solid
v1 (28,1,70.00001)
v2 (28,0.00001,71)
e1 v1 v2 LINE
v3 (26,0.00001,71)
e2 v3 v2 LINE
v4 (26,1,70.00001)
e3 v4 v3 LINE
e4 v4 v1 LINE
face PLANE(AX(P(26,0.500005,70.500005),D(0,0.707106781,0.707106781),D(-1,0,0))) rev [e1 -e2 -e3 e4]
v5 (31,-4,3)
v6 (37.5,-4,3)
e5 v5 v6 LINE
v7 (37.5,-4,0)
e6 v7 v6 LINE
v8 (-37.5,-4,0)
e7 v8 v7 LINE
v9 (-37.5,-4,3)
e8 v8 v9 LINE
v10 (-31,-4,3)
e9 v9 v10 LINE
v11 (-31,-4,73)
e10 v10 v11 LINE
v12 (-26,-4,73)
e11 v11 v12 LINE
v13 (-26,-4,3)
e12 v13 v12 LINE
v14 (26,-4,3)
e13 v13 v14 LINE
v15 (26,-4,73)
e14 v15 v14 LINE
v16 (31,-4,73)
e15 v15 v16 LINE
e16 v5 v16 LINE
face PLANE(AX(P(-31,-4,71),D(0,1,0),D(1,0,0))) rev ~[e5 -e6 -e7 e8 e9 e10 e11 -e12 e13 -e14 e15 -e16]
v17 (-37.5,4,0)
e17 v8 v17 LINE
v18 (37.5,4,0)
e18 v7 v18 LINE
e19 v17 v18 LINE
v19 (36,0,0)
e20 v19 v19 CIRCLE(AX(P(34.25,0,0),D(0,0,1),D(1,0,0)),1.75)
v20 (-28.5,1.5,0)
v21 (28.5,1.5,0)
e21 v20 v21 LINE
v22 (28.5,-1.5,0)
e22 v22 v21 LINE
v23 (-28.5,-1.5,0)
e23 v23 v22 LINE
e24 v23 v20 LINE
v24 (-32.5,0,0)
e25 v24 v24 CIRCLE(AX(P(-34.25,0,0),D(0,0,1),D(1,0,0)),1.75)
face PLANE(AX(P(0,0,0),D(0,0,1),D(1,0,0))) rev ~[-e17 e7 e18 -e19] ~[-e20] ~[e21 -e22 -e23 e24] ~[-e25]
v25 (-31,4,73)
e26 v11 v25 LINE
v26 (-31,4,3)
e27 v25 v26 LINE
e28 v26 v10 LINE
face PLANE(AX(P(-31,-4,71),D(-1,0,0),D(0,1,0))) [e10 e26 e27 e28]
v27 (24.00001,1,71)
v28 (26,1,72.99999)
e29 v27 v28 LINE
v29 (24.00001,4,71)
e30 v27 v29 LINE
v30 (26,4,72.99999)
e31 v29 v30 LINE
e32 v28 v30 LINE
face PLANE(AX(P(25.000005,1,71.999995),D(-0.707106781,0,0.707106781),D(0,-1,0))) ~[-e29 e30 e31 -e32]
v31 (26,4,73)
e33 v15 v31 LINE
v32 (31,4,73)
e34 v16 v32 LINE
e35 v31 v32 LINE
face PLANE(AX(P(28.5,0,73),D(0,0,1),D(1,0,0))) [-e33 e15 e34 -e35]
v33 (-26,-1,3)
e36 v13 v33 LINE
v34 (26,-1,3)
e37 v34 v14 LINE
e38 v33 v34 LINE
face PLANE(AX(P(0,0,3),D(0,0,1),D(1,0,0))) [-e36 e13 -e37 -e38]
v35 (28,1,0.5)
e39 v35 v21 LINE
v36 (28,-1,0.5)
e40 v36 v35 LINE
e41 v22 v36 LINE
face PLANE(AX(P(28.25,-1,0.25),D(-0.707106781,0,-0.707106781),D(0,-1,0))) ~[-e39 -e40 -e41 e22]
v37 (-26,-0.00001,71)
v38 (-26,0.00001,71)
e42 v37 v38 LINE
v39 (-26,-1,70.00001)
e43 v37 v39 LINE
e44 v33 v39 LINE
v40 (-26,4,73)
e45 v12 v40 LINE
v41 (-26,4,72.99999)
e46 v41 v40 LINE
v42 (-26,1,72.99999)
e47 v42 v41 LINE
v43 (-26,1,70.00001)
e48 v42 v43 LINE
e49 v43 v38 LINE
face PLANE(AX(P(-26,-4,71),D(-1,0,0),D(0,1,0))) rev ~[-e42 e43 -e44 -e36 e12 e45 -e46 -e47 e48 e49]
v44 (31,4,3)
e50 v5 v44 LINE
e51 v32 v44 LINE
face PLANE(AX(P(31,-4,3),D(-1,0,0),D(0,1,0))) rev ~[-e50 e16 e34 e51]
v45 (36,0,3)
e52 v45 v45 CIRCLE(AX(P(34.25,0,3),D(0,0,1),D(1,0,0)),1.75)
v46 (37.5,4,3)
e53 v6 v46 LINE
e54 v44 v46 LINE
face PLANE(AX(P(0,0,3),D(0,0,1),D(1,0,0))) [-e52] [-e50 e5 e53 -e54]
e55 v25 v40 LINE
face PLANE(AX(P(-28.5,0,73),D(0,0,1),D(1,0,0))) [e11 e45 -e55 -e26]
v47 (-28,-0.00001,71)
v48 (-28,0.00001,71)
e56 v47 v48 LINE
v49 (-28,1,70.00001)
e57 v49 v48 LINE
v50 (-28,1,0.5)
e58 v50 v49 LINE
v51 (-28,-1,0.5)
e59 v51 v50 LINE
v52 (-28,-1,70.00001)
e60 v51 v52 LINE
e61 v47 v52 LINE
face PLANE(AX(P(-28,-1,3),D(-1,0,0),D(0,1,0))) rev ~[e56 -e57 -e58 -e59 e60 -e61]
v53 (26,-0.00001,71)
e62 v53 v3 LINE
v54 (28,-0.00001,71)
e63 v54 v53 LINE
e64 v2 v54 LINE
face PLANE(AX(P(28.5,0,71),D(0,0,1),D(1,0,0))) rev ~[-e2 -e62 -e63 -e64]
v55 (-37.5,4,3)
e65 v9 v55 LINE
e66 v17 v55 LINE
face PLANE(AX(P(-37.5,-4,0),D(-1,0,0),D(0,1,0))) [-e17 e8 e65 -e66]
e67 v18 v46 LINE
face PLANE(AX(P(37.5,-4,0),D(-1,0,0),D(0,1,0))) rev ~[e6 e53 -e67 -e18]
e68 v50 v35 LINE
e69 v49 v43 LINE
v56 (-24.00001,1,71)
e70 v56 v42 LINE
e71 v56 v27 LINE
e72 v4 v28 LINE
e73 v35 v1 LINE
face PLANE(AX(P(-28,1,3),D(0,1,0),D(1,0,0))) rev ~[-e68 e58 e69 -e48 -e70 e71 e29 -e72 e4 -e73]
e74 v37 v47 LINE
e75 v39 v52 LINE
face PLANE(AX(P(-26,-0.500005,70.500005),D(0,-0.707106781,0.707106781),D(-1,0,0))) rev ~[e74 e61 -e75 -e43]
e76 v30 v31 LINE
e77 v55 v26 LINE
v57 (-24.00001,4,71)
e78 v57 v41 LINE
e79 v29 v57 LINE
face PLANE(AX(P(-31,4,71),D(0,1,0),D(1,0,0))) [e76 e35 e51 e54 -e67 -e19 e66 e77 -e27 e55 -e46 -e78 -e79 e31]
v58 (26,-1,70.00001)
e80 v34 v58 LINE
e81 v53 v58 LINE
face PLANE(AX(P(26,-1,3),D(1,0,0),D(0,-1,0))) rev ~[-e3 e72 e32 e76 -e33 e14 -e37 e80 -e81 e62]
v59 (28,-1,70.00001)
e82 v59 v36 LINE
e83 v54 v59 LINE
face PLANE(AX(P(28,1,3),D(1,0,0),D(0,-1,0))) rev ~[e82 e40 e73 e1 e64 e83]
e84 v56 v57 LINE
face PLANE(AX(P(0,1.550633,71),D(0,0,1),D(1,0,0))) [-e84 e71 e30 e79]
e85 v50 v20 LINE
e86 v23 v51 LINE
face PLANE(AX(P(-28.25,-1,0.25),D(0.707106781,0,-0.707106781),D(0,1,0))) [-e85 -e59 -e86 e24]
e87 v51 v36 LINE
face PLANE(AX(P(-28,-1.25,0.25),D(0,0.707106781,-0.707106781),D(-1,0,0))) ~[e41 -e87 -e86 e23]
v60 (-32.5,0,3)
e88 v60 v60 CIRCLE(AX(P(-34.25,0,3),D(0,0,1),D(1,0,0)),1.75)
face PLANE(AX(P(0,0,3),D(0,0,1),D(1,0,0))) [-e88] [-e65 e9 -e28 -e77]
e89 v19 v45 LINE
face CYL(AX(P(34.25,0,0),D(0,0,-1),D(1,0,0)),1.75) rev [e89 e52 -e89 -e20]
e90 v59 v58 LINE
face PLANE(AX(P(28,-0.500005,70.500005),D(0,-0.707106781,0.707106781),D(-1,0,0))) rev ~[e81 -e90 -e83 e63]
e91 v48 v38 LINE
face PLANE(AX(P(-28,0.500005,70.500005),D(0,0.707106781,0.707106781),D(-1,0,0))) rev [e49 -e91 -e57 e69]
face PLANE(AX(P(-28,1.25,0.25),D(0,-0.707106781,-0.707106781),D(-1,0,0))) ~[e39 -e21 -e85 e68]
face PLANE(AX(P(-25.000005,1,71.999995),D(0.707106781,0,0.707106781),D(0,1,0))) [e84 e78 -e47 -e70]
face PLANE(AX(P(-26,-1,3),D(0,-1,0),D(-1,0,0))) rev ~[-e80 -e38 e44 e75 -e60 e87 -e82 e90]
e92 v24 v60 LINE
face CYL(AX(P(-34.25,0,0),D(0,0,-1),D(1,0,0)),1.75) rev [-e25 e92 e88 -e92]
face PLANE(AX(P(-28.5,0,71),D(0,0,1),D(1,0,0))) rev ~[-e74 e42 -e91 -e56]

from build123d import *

# Parameters (mm, degrees)
F0_W     = 75
F0_H     = 8
F0_R     = 1.75
F0_W_2   = 56
F0_H_2   = 2
F1_DEPTH = 3
F3_DEPTH = 68
F4_W     = 5
F4_H     = 8
F5_DEPTH = 2
F6_SIZE  = 1.99999
F7_SIZE  = 0.99999
F8_SIZE  = 0.5


# Not quite as in the source:
# - a fillet or chamfer is up to 0.001 mm smaller than in the source, because OpenCascade refuses the exact size


with BuildPart() as f1:
    # F0 (on Top) → F1 (new body)
    with BuildSketch(Plane.XY):
        Rectangle(F0_W, F0_H)
        with Locations((-34.25, 0)):
            Circle(F0_R, mode=Mode.SUBTRACT)
        Rectangle(F0_W_2, F0_H_2, mode=Mode.SUBTRACT)
        with Locations((34.25, 0)):
            Circle(F0_R, mode=Mode.SUBTRACT)
    extrude(amount=F1_DEPTH)

    # F2 (on face) → F3 (join)
    with BuildSketch(Plane.XY.offset(3)):
        Polygon((-31, 4), (-31, -4), (-26, -4), (-26, -1), (-28, -1), (-28, 1), (28, 1), (28, -1), (26, -1), (26, -4), (31, -4), (31, 4), align=None)
    extrude(amount=F3_DEPTH)

    # F4 (on face) → F5 (join)
    with BuildSketch(Plane.XY.offset(71)):
        with Locations((-28.5, 0)):
            Rectangle(F4_W, F4_H)
        with Locations((28.5, 0)):
            Rectangle(F4_W, F4_H)
    extrude(amount=F5_DEPTH)

    # F6 (size 2 in the source; OpenCascade refuses exactly that, so slightly less here)
    f6_edges = [f1.edges().sort_by_distance(p)[0] for p in [
        (-26, 2.5, 71),
        (26, 2.5, 71),
    ]]
    chamfer(f6_edges, length=F6_SIZE)

    # F7 (size 1 in the source; OpenCascade refuses exactly that, so slightly less here)
    f7_edges = [f1.edges().sort_by_distance(p)[0] for p in [
        (-27, 1, 71),
        (27, 1, 71),
        (27, -1, 71),
        (-27, -1, 71),
    ]]
    chamfer(f7_edges, length=F7_SIZE)

    # F8
    f8_edges = [f1.edges().sort_by_distance(p)[0] for p in [
        (0, -1, 0),
        (0, 1, 0),
        (-28, 0, 0),
        (28, 0, 0),
    ]]
    chamfer(f8_edges, length=F8_SIZE)


solid = f1.part
